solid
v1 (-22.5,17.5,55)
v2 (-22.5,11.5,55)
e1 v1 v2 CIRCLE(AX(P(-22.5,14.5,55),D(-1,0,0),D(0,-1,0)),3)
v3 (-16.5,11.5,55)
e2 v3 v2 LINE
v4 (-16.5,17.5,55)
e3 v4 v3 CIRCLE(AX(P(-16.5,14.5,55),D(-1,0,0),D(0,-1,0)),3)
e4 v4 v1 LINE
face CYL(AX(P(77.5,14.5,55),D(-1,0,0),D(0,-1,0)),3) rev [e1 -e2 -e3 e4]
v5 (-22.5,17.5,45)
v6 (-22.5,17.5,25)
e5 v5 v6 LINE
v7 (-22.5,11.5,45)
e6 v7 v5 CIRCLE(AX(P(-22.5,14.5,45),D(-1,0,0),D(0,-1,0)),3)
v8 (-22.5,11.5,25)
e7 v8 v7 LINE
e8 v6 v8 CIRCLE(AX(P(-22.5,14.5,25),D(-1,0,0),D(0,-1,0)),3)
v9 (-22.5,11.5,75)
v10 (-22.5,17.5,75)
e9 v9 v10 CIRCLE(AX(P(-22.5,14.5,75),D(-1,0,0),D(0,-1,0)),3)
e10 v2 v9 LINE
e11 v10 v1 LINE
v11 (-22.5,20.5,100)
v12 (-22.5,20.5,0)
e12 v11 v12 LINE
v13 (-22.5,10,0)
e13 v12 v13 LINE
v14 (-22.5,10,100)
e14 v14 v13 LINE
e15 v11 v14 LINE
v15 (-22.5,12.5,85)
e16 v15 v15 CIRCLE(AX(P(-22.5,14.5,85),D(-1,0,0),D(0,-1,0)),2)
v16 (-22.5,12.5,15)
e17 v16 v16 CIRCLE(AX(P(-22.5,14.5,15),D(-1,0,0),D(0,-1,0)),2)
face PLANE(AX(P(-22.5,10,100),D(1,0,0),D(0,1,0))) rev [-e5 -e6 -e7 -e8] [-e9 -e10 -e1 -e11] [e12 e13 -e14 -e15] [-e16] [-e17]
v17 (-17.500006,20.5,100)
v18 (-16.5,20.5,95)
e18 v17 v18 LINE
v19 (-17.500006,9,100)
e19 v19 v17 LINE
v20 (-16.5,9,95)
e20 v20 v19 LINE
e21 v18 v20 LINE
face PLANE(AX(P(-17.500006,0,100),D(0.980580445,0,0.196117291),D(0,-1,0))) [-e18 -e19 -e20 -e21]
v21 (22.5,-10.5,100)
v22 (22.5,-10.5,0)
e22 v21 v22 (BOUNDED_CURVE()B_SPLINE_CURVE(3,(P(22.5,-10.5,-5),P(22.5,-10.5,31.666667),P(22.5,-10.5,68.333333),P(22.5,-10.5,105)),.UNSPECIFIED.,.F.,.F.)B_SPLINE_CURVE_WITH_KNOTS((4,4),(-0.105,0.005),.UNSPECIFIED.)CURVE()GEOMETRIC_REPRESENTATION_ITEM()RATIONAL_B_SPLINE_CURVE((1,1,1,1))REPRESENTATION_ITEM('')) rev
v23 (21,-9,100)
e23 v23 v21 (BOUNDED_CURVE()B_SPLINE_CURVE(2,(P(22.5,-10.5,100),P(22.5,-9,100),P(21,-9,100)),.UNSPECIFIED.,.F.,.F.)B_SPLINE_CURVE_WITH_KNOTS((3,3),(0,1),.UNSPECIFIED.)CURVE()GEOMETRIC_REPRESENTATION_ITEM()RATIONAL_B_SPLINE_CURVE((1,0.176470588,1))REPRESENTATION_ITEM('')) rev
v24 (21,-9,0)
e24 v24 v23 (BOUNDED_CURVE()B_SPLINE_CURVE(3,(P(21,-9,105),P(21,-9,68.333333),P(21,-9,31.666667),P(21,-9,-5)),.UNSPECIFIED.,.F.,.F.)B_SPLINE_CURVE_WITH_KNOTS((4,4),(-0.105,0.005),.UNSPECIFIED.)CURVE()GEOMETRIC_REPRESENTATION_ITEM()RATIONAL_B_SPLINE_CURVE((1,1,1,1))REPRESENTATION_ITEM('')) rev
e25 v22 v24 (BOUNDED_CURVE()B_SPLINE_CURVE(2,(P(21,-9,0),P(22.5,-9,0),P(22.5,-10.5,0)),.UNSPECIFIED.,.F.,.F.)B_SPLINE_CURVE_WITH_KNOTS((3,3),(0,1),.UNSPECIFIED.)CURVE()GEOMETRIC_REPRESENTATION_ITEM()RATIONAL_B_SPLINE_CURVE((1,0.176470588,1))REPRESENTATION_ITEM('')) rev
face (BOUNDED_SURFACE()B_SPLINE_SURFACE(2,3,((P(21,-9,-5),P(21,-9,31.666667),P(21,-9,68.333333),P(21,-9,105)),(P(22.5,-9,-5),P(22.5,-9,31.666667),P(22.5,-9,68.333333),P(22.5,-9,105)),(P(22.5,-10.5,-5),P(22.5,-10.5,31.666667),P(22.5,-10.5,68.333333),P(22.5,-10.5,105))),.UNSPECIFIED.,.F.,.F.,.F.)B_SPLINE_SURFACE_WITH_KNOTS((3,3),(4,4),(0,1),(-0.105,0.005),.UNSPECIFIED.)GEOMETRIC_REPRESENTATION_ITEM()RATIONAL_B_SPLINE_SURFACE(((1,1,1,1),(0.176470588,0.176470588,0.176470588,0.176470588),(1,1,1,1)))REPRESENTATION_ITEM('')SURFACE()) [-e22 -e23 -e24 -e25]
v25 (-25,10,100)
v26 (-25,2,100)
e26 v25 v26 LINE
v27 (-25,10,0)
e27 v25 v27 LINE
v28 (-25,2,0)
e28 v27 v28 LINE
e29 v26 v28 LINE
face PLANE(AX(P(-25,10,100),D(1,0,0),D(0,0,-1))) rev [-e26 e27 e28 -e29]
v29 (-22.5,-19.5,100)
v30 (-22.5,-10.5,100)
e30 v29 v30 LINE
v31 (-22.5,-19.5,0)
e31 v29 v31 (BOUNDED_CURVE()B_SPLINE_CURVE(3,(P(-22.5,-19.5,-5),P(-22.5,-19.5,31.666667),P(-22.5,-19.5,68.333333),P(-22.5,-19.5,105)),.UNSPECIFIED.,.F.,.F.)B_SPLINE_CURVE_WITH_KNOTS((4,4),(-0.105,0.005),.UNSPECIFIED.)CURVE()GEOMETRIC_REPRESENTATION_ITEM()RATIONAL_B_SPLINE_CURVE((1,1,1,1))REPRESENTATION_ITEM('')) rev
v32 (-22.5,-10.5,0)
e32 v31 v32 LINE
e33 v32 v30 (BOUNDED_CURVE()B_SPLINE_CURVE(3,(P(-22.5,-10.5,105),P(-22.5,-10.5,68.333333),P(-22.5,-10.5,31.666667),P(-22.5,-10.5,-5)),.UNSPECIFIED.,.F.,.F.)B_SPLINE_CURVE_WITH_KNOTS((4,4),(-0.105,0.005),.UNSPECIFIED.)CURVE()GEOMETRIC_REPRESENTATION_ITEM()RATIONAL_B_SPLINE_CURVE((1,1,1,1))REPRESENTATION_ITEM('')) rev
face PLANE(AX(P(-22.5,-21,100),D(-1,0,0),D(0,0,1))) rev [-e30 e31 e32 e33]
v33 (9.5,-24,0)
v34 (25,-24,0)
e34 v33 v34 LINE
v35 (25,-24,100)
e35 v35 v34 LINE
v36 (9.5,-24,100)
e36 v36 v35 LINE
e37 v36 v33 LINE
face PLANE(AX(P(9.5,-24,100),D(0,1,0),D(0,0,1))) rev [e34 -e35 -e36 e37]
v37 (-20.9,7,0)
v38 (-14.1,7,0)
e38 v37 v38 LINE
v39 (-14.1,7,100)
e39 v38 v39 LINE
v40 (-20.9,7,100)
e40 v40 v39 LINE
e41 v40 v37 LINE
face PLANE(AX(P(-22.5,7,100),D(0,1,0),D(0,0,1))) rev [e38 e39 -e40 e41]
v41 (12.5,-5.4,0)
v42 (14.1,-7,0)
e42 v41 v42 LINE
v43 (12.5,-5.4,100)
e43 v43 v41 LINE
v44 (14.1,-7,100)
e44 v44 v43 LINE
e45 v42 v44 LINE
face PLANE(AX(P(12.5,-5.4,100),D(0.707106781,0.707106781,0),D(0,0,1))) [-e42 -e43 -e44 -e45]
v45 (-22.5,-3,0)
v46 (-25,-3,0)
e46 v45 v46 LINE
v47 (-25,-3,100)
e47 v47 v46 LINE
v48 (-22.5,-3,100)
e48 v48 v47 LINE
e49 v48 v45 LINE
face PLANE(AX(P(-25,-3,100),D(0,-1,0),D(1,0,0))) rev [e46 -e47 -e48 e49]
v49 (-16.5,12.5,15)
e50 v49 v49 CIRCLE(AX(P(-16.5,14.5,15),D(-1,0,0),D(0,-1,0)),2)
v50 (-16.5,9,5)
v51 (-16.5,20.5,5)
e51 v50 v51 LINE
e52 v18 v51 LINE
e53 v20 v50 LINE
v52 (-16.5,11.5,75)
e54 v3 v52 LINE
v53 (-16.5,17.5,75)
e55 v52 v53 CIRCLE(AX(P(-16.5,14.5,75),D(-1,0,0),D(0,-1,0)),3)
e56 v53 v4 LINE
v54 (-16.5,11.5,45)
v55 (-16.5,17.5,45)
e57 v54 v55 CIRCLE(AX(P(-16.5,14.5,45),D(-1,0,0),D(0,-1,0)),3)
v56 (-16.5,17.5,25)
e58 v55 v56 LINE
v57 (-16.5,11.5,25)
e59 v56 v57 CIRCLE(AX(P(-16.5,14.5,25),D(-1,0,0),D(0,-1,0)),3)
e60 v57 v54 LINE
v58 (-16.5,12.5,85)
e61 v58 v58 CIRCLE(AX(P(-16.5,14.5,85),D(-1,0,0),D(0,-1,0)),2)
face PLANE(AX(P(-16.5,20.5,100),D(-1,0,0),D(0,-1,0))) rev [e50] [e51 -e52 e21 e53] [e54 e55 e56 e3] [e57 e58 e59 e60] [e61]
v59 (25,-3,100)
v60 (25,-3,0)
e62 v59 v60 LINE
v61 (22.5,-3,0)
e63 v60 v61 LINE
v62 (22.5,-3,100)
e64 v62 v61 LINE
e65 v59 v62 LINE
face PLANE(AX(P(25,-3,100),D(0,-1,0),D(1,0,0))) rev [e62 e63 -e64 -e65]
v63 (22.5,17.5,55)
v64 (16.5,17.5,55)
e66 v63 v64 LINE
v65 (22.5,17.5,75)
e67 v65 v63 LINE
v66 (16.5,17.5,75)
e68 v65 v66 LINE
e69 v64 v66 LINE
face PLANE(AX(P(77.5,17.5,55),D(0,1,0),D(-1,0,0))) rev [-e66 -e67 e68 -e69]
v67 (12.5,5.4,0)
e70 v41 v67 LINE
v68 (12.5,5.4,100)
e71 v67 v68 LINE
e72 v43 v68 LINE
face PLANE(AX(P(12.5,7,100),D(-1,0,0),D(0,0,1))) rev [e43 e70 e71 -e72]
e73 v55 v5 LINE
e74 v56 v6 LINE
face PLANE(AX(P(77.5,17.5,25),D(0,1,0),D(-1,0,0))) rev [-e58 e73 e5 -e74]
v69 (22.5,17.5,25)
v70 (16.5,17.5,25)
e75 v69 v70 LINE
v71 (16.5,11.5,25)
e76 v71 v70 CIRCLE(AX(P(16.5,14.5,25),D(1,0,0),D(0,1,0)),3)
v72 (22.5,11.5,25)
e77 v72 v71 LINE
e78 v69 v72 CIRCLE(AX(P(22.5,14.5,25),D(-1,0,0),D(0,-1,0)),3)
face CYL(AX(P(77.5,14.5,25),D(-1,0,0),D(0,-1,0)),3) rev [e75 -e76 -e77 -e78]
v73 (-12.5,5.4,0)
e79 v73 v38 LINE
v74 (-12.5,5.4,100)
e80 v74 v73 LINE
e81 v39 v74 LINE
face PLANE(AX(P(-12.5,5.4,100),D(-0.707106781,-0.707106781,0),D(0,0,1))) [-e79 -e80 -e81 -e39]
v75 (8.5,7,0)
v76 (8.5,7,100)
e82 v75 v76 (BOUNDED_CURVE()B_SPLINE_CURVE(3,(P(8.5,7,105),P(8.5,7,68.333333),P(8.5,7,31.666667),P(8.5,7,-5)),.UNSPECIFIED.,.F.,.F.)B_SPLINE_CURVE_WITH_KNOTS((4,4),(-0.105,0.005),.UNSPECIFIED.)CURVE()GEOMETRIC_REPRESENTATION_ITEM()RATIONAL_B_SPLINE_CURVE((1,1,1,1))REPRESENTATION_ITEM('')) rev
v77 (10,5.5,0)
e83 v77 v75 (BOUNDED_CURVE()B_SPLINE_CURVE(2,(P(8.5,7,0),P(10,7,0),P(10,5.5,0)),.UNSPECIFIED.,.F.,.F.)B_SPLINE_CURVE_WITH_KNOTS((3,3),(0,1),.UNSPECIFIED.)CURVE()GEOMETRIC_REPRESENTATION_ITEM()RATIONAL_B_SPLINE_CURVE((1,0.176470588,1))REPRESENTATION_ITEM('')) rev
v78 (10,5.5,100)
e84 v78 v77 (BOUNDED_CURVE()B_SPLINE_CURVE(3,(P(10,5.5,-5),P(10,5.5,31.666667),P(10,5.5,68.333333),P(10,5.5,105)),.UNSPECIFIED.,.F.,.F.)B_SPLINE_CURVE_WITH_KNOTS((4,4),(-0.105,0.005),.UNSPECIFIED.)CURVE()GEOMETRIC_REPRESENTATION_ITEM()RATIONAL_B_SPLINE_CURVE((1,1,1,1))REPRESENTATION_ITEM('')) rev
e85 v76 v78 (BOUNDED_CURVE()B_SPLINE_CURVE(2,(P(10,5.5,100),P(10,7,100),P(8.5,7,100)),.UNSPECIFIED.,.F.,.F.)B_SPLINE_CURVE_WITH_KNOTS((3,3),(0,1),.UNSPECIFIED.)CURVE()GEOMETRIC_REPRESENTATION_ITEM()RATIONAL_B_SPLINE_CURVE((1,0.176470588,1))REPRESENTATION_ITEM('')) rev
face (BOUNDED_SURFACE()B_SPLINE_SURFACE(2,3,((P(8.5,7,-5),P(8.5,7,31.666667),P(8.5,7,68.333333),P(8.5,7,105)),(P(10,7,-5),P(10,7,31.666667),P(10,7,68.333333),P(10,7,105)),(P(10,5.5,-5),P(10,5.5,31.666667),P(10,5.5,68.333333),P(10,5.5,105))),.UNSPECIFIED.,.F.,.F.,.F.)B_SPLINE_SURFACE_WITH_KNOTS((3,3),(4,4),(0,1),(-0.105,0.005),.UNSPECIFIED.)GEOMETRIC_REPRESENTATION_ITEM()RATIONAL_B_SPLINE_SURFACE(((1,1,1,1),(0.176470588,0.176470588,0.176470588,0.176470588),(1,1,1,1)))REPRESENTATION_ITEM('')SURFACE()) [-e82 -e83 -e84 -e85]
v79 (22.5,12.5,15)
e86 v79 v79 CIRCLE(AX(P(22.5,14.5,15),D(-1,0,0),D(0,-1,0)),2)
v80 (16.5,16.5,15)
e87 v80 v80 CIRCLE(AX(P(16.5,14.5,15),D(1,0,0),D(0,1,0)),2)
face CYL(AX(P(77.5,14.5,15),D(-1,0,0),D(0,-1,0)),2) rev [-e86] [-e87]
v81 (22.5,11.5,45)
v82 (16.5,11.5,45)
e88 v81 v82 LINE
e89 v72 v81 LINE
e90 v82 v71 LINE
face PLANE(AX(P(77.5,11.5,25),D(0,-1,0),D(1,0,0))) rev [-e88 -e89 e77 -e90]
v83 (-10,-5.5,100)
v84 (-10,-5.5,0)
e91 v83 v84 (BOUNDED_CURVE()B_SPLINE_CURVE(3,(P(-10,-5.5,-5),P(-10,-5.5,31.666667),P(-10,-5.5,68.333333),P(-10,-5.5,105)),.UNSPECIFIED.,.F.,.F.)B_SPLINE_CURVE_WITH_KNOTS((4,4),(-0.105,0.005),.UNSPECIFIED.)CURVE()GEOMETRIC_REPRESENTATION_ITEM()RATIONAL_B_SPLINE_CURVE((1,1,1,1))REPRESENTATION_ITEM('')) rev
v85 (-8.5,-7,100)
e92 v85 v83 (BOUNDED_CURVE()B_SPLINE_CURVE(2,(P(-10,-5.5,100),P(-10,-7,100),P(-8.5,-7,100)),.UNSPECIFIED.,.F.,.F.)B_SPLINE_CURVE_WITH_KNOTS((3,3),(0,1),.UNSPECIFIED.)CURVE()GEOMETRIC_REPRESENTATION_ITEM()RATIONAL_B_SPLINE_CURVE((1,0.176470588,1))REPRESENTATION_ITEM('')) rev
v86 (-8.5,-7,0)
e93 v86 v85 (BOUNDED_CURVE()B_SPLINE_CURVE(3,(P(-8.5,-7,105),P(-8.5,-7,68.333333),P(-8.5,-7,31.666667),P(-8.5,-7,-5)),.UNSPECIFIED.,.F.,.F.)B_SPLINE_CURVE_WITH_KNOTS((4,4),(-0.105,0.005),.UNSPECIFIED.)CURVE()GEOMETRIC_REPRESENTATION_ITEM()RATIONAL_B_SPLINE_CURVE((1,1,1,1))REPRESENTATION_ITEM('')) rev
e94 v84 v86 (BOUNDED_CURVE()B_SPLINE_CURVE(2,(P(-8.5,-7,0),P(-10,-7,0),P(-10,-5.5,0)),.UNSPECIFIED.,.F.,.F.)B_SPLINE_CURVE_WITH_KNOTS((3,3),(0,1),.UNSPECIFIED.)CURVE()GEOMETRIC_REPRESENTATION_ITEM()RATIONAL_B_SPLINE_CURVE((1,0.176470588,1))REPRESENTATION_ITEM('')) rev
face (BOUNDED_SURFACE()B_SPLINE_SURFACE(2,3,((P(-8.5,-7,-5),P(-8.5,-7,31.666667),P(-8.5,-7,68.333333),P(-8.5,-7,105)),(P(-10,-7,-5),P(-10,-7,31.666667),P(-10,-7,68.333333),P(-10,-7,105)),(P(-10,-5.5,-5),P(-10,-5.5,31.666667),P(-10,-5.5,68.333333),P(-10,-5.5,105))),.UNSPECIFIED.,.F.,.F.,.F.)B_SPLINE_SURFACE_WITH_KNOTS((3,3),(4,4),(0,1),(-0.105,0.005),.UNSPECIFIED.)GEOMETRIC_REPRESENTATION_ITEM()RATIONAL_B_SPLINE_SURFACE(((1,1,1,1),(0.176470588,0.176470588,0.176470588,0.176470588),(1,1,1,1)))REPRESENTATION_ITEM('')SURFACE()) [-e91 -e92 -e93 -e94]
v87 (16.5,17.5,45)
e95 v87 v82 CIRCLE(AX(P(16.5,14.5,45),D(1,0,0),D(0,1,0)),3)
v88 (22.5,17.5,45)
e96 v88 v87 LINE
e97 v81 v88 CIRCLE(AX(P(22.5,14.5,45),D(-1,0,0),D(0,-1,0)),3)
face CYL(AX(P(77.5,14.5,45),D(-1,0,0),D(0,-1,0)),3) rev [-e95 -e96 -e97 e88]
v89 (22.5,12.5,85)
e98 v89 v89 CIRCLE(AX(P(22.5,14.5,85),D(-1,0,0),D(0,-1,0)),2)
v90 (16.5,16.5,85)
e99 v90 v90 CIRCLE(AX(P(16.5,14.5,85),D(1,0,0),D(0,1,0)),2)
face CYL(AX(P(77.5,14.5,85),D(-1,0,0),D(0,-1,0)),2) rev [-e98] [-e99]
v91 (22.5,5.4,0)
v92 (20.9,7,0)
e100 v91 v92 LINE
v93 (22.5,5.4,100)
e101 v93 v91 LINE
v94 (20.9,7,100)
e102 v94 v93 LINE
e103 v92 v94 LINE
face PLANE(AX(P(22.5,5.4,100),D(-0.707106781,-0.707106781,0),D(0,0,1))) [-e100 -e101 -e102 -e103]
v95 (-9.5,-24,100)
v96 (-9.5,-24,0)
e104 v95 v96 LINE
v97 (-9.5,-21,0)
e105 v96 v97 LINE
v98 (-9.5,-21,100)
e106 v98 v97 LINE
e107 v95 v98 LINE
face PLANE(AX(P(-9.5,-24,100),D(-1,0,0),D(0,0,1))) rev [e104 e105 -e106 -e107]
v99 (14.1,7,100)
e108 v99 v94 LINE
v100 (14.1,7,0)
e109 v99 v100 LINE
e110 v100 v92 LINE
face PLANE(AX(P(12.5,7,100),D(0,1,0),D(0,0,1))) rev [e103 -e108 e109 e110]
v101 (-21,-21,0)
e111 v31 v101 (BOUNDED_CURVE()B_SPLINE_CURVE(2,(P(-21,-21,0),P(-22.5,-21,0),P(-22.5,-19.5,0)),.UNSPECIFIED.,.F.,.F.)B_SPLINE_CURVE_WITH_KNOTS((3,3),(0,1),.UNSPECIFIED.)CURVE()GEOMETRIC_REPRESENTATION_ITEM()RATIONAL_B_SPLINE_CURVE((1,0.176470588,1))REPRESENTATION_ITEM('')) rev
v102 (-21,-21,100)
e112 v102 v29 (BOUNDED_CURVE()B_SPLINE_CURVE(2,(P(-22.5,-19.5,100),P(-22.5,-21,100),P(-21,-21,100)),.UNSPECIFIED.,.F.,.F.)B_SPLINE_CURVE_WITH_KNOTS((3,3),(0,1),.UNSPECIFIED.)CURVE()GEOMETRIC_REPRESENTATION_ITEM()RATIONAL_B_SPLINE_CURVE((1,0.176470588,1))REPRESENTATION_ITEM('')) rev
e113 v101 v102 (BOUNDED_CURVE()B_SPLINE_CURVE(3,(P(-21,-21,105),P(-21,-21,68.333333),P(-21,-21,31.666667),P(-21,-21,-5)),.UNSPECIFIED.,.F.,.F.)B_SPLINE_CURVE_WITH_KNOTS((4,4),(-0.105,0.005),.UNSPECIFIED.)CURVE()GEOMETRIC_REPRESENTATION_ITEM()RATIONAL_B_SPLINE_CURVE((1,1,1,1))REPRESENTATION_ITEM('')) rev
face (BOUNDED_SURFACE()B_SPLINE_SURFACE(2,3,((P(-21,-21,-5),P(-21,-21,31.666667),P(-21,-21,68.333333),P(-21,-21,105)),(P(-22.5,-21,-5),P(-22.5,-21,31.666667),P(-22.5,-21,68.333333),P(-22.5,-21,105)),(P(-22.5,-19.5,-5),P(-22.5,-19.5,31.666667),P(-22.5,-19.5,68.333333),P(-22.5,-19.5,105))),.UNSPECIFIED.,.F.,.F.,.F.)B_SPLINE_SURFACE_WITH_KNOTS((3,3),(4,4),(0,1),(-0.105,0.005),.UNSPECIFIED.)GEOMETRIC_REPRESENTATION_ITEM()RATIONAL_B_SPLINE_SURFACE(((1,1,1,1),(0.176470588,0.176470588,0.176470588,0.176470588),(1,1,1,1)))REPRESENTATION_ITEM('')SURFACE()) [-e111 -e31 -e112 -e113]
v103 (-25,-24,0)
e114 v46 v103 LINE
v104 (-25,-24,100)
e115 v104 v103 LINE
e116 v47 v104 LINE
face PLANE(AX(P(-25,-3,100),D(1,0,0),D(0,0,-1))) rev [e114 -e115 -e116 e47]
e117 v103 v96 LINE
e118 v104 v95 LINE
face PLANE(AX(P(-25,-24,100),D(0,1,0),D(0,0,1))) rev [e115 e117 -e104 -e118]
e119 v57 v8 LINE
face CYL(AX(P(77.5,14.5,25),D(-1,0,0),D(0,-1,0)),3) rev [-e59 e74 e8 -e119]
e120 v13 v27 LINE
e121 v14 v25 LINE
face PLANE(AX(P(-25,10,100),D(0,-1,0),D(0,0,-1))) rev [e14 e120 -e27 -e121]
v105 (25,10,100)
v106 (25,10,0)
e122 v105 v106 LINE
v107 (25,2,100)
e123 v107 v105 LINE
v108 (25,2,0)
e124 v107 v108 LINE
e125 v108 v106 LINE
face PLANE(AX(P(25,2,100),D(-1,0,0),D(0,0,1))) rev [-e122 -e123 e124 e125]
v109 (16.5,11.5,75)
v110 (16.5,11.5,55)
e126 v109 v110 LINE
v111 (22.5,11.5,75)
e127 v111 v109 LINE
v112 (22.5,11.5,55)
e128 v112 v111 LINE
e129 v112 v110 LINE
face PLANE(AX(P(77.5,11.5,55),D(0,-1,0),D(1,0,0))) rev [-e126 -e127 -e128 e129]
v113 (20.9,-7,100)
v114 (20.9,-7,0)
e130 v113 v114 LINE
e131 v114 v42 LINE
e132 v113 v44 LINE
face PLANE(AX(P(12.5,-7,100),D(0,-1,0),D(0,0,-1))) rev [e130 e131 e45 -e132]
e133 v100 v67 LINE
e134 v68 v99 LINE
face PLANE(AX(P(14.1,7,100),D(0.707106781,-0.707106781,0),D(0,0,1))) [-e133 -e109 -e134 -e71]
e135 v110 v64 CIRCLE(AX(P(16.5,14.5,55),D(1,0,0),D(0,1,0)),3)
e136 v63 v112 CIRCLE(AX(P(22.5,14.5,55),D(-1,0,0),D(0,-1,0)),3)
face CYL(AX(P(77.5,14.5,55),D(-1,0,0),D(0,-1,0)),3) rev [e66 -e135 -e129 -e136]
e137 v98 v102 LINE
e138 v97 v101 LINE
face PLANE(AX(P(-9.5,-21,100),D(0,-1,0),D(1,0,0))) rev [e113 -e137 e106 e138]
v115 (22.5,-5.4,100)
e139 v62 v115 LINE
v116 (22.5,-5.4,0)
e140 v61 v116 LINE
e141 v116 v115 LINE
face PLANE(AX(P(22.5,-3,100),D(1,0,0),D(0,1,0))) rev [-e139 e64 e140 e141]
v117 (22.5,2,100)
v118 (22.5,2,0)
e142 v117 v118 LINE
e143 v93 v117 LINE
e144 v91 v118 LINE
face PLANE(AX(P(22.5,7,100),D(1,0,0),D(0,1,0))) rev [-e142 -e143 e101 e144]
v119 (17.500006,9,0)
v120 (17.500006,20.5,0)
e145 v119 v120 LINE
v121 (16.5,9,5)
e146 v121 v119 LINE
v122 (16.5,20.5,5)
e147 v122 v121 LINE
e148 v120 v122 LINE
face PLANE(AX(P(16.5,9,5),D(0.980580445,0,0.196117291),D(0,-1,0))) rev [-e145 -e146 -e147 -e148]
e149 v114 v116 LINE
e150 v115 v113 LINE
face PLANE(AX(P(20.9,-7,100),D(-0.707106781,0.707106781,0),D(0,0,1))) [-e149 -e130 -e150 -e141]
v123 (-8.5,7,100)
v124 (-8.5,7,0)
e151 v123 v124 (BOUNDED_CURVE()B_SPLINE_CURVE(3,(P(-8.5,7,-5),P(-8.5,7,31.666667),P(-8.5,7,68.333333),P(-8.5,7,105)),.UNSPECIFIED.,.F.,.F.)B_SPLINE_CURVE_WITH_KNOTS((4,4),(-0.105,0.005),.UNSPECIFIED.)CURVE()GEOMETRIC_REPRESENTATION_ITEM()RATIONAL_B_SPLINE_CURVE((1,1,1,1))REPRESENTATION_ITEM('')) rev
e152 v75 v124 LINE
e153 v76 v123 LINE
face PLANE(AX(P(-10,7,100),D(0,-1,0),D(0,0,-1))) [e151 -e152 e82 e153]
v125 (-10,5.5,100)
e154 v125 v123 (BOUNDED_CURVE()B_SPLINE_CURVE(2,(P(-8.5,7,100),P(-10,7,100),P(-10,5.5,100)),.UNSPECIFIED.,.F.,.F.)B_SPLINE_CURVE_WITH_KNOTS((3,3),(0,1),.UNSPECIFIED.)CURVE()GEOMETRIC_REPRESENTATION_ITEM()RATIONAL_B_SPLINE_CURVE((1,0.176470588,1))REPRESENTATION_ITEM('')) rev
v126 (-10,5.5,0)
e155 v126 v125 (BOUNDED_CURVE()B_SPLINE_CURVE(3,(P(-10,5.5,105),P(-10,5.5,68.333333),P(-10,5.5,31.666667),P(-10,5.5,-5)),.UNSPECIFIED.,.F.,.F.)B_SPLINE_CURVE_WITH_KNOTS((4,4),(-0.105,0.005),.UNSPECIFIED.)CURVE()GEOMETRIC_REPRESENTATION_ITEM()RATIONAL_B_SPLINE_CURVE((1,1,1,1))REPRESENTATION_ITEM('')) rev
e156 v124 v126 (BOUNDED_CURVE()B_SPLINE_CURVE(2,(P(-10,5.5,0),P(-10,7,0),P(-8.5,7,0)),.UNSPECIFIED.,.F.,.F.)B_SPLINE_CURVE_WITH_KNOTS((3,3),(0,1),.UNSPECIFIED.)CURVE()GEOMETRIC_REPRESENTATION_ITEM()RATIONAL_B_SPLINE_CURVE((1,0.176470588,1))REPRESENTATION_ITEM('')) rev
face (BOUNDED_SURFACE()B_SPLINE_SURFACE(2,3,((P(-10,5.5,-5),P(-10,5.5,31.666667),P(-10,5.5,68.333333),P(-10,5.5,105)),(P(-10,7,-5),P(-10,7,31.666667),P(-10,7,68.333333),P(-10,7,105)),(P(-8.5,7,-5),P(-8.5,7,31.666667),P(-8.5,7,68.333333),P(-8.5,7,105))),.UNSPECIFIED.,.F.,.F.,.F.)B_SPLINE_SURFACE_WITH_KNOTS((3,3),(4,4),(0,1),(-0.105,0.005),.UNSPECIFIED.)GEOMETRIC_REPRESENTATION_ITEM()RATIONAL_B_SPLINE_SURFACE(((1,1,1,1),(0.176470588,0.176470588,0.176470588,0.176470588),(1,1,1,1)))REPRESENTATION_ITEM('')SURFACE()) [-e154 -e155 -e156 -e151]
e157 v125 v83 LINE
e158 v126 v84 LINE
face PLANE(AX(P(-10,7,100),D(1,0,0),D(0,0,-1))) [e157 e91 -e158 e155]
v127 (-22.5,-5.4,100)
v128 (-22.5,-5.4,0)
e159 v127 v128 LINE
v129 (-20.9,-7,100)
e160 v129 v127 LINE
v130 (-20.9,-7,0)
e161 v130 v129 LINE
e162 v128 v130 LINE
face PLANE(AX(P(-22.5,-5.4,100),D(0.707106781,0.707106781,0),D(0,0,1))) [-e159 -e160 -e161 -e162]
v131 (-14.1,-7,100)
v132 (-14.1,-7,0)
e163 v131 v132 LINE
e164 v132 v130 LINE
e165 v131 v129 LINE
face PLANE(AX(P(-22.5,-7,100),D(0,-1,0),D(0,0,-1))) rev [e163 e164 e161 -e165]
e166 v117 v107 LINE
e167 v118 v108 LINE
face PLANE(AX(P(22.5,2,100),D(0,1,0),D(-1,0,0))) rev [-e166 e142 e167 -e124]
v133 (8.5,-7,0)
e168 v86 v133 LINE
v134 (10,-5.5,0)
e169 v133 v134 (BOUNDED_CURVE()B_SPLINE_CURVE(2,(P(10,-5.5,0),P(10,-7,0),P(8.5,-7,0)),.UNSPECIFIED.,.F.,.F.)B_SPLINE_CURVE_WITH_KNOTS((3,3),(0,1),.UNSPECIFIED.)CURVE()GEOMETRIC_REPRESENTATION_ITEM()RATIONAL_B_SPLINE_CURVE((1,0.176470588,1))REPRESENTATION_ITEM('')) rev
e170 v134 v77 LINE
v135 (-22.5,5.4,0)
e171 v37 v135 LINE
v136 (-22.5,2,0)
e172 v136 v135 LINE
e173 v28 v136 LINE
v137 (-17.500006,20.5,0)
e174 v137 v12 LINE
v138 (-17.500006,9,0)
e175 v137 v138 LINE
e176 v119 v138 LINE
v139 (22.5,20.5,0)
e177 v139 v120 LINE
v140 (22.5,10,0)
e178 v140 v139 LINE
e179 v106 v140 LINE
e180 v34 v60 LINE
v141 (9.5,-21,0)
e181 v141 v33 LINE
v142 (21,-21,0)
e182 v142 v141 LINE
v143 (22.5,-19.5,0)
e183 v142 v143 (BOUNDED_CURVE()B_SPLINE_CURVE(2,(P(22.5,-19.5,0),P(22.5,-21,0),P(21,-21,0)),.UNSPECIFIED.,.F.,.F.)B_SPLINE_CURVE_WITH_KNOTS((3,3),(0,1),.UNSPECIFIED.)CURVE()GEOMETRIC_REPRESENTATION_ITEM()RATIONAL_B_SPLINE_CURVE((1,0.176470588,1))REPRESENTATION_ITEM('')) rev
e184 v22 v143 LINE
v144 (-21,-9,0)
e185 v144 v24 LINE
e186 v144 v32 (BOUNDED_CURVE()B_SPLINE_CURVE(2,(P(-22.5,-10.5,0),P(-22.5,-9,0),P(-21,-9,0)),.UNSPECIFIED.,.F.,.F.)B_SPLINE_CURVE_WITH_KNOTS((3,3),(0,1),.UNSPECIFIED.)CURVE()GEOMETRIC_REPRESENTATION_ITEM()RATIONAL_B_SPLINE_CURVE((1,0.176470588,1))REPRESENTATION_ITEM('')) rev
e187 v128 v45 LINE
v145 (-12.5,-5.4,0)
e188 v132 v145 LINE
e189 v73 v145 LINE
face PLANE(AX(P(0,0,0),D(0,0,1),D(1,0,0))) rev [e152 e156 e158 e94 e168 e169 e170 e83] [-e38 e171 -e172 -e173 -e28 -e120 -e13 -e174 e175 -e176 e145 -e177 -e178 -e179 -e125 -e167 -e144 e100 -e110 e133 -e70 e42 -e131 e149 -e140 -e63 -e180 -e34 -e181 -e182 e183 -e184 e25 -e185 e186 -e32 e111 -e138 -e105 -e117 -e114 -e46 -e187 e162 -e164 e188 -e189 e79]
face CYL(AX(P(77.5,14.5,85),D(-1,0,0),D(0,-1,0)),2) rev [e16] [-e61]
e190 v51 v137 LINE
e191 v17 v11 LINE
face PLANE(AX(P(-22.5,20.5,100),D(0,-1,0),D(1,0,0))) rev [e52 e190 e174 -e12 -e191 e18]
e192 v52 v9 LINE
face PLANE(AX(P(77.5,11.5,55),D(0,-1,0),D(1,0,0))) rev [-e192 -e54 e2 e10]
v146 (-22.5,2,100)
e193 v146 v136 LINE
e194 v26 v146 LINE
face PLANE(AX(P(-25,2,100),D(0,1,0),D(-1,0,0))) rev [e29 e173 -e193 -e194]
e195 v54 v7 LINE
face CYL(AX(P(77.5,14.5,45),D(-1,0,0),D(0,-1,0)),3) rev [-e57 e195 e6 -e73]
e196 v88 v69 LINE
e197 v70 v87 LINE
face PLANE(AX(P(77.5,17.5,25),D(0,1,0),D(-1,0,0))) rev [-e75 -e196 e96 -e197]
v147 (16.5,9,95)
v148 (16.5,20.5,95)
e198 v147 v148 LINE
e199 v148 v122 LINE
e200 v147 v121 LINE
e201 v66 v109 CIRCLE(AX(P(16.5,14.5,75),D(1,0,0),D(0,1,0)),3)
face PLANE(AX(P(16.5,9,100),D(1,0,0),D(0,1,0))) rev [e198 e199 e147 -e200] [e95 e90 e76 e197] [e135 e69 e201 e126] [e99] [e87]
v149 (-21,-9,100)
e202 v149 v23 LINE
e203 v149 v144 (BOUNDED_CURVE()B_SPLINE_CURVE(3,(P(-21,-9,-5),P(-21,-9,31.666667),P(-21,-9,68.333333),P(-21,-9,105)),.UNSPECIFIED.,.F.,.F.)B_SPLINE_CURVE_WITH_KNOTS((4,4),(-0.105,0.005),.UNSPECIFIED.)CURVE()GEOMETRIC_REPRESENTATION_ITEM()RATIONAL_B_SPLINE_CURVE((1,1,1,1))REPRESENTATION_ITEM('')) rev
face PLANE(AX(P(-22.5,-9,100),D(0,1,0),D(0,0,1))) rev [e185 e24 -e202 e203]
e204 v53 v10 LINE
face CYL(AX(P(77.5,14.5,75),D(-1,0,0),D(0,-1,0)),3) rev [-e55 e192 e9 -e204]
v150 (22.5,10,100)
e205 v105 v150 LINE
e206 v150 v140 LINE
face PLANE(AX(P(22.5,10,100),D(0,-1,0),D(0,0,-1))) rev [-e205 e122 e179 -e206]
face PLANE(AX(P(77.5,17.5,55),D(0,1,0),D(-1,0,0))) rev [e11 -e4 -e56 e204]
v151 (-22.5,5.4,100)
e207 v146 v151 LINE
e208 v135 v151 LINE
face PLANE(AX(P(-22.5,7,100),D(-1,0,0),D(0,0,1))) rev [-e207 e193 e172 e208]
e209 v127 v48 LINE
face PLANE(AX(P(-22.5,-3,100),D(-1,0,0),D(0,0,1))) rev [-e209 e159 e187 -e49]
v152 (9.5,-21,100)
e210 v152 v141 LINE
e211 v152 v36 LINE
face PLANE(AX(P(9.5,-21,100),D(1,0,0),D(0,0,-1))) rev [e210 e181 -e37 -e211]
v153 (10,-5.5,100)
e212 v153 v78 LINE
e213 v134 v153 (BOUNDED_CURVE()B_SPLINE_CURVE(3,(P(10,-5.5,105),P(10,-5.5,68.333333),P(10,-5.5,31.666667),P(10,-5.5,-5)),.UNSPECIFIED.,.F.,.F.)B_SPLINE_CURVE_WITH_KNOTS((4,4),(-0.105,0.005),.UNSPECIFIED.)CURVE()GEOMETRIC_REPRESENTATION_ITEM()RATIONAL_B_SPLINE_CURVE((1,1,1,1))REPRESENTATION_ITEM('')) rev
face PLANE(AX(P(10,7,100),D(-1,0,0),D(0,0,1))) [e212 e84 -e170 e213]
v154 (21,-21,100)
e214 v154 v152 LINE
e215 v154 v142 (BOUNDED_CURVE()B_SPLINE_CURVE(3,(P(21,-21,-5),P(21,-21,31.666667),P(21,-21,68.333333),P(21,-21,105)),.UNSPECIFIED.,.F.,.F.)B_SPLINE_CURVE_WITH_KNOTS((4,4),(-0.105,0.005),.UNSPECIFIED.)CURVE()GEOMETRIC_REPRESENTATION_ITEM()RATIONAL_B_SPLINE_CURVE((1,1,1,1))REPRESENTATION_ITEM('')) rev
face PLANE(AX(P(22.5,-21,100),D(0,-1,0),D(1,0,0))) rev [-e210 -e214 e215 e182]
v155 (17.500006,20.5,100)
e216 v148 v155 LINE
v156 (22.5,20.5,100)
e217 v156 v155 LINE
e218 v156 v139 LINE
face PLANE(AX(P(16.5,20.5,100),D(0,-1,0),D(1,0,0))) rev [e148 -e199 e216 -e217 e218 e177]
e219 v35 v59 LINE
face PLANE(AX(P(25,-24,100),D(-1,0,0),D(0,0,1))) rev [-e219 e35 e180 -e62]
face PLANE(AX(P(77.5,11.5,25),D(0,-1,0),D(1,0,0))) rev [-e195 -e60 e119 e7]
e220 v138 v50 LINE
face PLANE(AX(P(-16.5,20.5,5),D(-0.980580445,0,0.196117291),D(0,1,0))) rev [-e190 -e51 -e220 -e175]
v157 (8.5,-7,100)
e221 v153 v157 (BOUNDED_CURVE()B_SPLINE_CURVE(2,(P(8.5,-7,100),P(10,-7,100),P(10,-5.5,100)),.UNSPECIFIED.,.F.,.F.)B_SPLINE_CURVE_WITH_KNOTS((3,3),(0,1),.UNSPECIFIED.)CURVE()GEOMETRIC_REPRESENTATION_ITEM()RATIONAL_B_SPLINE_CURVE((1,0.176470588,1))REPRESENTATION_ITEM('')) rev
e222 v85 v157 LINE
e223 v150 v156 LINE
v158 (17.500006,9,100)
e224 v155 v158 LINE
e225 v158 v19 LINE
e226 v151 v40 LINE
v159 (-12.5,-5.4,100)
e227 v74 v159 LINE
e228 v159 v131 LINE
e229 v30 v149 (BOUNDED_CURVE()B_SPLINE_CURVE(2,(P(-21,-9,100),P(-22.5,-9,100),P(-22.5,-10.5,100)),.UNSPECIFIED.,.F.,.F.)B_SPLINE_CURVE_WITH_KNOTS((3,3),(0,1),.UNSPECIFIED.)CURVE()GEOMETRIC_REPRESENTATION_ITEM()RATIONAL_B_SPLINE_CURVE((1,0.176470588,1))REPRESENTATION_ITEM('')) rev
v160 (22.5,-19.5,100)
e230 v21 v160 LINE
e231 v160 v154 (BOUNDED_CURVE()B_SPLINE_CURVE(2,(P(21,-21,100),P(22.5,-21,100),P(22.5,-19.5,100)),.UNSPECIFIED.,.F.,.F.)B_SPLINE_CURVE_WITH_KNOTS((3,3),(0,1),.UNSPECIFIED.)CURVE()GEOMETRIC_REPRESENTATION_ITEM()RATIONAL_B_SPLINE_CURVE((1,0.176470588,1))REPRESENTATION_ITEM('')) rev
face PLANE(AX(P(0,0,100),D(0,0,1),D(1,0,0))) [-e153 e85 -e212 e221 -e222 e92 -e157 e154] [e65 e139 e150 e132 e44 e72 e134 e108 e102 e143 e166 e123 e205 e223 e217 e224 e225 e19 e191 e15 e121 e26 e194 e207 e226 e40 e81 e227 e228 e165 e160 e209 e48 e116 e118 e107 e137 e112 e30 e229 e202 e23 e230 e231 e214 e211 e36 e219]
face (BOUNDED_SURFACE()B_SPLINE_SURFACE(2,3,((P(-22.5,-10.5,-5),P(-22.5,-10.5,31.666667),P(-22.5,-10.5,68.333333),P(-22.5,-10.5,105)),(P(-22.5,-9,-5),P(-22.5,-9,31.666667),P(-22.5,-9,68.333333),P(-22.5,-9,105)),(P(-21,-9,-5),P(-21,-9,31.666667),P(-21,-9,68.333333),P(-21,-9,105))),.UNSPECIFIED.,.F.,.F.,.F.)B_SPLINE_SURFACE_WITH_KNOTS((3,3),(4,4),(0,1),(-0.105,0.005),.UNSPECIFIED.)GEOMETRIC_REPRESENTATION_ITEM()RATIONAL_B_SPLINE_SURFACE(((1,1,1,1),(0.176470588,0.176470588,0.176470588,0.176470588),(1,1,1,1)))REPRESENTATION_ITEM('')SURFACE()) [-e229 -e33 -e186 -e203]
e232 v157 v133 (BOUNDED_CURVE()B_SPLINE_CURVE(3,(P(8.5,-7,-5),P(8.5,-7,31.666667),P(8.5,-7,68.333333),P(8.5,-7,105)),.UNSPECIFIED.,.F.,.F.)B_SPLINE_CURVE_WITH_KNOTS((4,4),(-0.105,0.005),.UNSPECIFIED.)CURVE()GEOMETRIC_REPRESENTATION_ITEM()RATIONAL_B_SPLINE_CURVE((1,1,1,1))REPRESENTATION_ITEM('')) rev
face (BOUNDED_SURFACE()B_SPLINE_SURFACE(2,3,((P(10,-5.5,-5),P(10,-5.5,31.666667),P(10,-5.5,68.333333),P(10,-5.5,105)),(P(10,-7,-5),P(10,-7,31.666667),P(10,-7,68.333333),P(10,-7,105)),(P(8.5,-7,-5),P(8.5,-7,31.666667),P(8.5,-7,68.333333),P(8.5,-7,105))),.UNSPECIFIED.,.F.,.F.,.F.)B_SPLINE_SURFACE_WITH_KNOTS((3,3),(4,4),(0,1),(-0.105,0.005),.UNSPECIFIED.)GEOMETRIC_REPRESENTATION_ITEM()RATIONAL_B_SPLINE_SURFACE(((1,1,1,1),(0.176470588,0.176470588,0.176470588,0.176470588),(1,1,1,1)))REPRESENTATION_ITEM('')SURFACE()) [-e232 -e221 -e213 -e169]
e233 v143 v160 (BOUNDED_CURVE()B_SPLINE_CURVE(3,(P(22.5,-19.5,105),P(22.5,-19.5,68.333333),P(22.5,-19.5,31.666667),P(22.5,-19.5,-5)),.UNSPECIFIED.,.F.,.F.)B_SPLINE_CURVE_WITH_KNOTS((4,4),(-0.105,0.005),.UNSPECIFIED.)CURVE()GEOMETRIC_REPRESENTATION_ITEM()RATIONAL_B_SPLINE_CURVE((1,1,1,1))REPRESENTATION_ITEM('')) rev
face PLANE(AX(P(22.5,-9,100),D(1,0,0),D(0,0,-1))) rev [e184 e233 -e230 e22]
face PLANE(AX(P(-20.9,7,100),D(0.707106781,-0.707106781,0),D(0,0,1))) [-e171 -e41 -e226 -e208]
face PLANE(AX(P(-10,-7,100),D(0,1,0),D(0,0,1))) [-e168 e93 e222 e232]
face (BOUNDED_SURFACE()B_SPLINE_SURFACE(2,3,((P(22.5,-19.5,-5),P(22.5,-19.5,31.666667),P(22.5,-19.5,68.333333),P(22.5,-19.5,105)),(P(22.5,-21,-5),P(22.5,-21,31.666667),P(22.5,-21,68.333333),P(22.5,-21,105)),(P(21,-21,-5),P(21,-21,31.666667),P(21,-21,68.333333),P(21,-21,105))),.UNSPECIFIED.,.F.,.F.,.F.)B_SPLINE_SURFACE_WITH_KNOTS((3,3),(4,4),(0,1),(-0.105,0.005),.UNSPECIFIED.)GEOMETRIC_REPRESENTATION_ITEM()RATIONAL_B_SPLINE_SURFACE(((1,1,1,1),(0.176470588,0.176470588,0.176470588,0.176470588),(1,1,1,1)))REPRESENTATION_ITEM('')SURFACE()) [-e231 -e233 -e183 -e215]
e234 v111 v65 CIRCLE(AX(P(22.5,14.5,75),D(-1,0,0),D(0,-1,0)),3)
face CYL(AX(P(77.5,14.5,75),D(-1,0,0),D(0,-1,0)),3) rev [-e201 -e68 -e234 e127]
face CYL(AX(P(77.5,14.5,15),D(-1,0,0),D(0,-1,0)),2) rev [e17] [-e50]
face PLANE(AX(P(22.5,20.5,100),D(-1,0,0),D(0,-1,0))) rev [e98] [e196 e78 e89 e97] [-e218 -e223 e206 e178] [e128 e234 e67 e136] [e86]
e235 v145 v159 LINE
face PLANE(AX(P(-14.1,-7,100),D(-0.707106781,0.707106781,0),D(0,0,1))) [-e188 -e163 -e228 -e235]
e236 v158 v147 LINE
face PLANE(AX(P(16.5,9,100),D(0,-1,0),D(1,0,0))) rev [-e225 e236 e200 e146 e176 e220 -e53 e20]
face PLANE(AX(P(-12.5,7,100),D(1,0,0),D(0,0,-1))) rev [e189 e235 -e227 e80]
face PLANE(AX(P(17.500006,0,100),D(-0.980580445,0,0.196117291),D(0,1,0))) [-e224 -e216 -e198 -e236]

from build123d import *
from OCP.BRepFilletAPI import BRepFilletAPI_MakeChamfer

# Parameters (mm, degrees)
SCHIZZO1_W                   = 20
SCHIZZO1_H                   = 14
ESTRUSIONE_ESTRUSIONE1_DEPTH = 100
RACCORDO1_SIZE               = 1.5
SMUSSO1_SIZE                 = 1.6
SCHIZZO2_R                   = 2
TAGLIO_ESTRUSIONE1_DEPTH     = 100
SMUSSO2_SIZE                 = 5
SMUSSO2_SIZE2                = 1.000006128
SMUSSO3_SIZE                 = 5
SMUSSO3_SIZE2                = 1.000006128


with BuildPart() as part:
    # Schizzo1 → Estrusione-Estrusione1 (new body)
    with BuildSketch(Plane.XY):
        Polygon((-22.5, -9), (22.5, -9), (22.5, -21), (9.5, -21), (9.5, -24), (25, -24), (25, -3), (22.5, -3), (22.5, -7), (12.5, -7), (12.5, 7), (22.5, 7), (22.5, 2), (25, 2), (25, 10), (22.5, 10), (22.5, 20.5), (16.5, 20.5), (16.5, 9), (-16.5, 9), (-16.5, 20.5), (-22.5, 20.5), (-22.5, 10), (-25, 10), (-25, 2), (-22.5, 2), (-22.5, 7), (-12.5, 7), (-12.5, -7), (-22.5, -7), (-22.5, -3), (-25, -3), (-25, -24), (-9.5, -24), (-9.5, -21), (-22.5, -21), align=None)
        Rectangle(SCHIZZO1_W, SCHIZZO1_H, mode=Mode.SUBTRACT)
    extrude(amount=ESTRUSIONE_ESTRUSIONE1_DEPTH)

    # Raccordo1
    # a fillet whose section is not a circle: 1.5 mm, written as the material it adds along each edge
    with BuildSketch(Plane(origin=(-10, -7, 0), x_dir=(1, 0, 0), z_dir=(0, 0, 1)), Plane(origin=(10, 7, 0), x_dir=(-1, 0, 0), z_dir=(0, 0, 1)), Plane(origin=(10, -7, 0), x_dir=(0, 1, 0), z_dir=(0, 0, 1)), Plane(origin=(22.5, -21, 0), x_dir=(0, 1, 0), z_dir=(0, 0, 1)), Plane(origin=(22.5, -9, 0), x_dir=(-1, 0, 0), z_dir=(0, 0, 1)), Plane(origin=(-22.5, -21, 0), x_dir=(1, 0, 0), z_dir=(0, 0, 1))) as raccordo1_piece_1:
        with BuildLine():
            Bezier((RACCORDO1_SIZE, 0), (0, 0), (0, RACCORDO1_SIZE), weights=[1, 0.176470588, 1])
            Line((0, RACCORDO1_SIZE), (0, 0))
            Line((0, 0), (RACCORDO1_SIZE, 0))
        make_face()
    extrude(amount=100)
    with BuildSketch(Plane(origin=(-10, 7, 0), x_dir=(1, 0, 0), z_dir=(0, 0, 1)), Plane(origin=(-22.5, -9, 0), x_dir=(1, 0, 0), z_dir=(0, 0, 1))) as raccordo1_piece_2:
        with BuildLine():
            Bezier((RACCORDO1_SIZE, 0), (0, 0), (0, -RACCORDO1_SIZE), weights=[1, 0.176470588, 1])
            Line((0, -RACCORDO1_SIZE), (0, 0))
            Line((0, 0), (RACCORDO1_SIZE, 0))
        make_face()
    extrude(amount=100)

    # Smusso1
    smusso1_edges = [part.edges().sort_by_distance(p)[0] for p in [
        (22.5, 7, 50),
        (12.5, 7, 50),
        (12.5, -7, 50),
        (22.5, -7, 50),
        (-22.5, -7, 50),
        (-12.5, -7, 50),
        (-12.5, 7, 50),
        (-22.5, 7, 50),
    ]]
    chamfer(smusso1_edges, length=SMUSSO1_SIZE)

    # Schizzo2 → Taglio-Estrusione1 (cut)
    with BuildSketch(Plane.ZY.offset(22.5)):
        with Locations(Location((85, 14.5, 0), (0, 0, 270))):
            Circle(SCHIZZO2_R)
        with Locations(Location((15, 14.5, 0), (0, 0, 270))):
            Circle(SCHIZZO2_R)
        with BuildLine():
            Line((25, 17.5), (45, 17.5))
            ThreePointArc((45, 17.5), (48, 14.5), (45, 11.5))
            Line((45, 11.5), (25, 11.5))
            ThreePointArc((25, 11.5), (22, 14.5), (25, 17.5))
        make_face()
        with BuildLine():
            Line((55, 17.5), (75, 17.5))
            ThreePointArc((75, 17.5), (78, 14.5), (75, 11.5))
            Line((75, 11.5), (55, 11.5))
            ThreePointArc((55, 11.5), (52, 14.5), (55, 17.5))
        make_face()
    extrude(amount=-TAGLIO_ESTRUSIONE1_DEPTH, mode=Mode.SUBTRACT)

    # Smusso2: one chamfer whose edges measure the first distance from different faces: ONE call of the kernel's chamfer builder (chamfer() names one face for all edges)
    smusso2_edges_1 = [part.edges().sort_by_distance(p)[0] for p in [
        (16.5, 14.75, 100),
    ]]
    smusso2_side_1 = [part.faces().sort_by_distance(p)[0] for p in [
        (16.5, 14.847088672, 50),
    ]]
    smusso2_edges_2 = [part.edges().sort_by_distance(p)[0] for p in [
        (-16.5, 14.75, 100),
    ]]
    smusso2_side_2 = [part.faces().sort_by_distance(p)[0] for p in [
        (-16.5, 14.847088672, 50),
    ]]
    smusso2 = BRepFilletAPI_MakeChamfer(part.part.solid().wrapped)
    for e in smusso2_edges_1:
        smusso2.Add(SMUSSO2_SIZE, SMUSSO2_SIZE2, e.wrapped, smusso2_side_1[0].wrapped)  # the first distance lies on this face
    for e in smusso2_edges_2:
        smusso2.Add(SMUSSO2_SIZE, SMUSSO2_SIZE2, e.wrapped, smusso2_side_2[0].wrapped)  # the first distance lies on this face
    add(Compound.cast(smusso2.Shape()), mode=Mode.REPLACE)

    # Smusso3: one chamfer whose edges measure the first distance from different faces: ONE call of the kernel's chamfer builder (chamfer() names one face for all edges)
    smusso3_edges_1 = [part.edges().sort_by_distance(p)[0] for p in [
        (-16.5, 14.75, 0),
    ]]
    smusso3_side_1 = [part.faces().sort_by_distance(p)[0] for p in [
        (-16.5, 9.956935212, 47.5),
    ]]
    smusso3_edges_2 = [part.edges().sort_by_distance(p)[0] for p in [
        (16.5, 14.75, 0),
    ]]
    smusso3_side_2 = [part.faces().sort_by_distance(p)[0] for p in [
        (16.5, 19.543064788, 47.5),
    ]]
    smusso3 = BRepFilletAPI_MakeChamfer(part.part.solid().wrapped)
    for e in smusso3_edges_1:
        smusso3.Add(SMUSSO3_SIZE, SMUSSO3_SIZE2, e.wrapped, smusso3_side_1[0].wrapped)  # the first distance lies on this face
    for e in smusso3_edges_2:
        smusso3.Add(SMUSSO3_SIZE, SMUSSO3_SIZE2, e.wrapped, smusso3_side_2[0].wrapped)  # the first distance lies on this face
    add(Compound.cast(smusso3.Shape()), mode=Mode.REPLACE)


solid = part.part
